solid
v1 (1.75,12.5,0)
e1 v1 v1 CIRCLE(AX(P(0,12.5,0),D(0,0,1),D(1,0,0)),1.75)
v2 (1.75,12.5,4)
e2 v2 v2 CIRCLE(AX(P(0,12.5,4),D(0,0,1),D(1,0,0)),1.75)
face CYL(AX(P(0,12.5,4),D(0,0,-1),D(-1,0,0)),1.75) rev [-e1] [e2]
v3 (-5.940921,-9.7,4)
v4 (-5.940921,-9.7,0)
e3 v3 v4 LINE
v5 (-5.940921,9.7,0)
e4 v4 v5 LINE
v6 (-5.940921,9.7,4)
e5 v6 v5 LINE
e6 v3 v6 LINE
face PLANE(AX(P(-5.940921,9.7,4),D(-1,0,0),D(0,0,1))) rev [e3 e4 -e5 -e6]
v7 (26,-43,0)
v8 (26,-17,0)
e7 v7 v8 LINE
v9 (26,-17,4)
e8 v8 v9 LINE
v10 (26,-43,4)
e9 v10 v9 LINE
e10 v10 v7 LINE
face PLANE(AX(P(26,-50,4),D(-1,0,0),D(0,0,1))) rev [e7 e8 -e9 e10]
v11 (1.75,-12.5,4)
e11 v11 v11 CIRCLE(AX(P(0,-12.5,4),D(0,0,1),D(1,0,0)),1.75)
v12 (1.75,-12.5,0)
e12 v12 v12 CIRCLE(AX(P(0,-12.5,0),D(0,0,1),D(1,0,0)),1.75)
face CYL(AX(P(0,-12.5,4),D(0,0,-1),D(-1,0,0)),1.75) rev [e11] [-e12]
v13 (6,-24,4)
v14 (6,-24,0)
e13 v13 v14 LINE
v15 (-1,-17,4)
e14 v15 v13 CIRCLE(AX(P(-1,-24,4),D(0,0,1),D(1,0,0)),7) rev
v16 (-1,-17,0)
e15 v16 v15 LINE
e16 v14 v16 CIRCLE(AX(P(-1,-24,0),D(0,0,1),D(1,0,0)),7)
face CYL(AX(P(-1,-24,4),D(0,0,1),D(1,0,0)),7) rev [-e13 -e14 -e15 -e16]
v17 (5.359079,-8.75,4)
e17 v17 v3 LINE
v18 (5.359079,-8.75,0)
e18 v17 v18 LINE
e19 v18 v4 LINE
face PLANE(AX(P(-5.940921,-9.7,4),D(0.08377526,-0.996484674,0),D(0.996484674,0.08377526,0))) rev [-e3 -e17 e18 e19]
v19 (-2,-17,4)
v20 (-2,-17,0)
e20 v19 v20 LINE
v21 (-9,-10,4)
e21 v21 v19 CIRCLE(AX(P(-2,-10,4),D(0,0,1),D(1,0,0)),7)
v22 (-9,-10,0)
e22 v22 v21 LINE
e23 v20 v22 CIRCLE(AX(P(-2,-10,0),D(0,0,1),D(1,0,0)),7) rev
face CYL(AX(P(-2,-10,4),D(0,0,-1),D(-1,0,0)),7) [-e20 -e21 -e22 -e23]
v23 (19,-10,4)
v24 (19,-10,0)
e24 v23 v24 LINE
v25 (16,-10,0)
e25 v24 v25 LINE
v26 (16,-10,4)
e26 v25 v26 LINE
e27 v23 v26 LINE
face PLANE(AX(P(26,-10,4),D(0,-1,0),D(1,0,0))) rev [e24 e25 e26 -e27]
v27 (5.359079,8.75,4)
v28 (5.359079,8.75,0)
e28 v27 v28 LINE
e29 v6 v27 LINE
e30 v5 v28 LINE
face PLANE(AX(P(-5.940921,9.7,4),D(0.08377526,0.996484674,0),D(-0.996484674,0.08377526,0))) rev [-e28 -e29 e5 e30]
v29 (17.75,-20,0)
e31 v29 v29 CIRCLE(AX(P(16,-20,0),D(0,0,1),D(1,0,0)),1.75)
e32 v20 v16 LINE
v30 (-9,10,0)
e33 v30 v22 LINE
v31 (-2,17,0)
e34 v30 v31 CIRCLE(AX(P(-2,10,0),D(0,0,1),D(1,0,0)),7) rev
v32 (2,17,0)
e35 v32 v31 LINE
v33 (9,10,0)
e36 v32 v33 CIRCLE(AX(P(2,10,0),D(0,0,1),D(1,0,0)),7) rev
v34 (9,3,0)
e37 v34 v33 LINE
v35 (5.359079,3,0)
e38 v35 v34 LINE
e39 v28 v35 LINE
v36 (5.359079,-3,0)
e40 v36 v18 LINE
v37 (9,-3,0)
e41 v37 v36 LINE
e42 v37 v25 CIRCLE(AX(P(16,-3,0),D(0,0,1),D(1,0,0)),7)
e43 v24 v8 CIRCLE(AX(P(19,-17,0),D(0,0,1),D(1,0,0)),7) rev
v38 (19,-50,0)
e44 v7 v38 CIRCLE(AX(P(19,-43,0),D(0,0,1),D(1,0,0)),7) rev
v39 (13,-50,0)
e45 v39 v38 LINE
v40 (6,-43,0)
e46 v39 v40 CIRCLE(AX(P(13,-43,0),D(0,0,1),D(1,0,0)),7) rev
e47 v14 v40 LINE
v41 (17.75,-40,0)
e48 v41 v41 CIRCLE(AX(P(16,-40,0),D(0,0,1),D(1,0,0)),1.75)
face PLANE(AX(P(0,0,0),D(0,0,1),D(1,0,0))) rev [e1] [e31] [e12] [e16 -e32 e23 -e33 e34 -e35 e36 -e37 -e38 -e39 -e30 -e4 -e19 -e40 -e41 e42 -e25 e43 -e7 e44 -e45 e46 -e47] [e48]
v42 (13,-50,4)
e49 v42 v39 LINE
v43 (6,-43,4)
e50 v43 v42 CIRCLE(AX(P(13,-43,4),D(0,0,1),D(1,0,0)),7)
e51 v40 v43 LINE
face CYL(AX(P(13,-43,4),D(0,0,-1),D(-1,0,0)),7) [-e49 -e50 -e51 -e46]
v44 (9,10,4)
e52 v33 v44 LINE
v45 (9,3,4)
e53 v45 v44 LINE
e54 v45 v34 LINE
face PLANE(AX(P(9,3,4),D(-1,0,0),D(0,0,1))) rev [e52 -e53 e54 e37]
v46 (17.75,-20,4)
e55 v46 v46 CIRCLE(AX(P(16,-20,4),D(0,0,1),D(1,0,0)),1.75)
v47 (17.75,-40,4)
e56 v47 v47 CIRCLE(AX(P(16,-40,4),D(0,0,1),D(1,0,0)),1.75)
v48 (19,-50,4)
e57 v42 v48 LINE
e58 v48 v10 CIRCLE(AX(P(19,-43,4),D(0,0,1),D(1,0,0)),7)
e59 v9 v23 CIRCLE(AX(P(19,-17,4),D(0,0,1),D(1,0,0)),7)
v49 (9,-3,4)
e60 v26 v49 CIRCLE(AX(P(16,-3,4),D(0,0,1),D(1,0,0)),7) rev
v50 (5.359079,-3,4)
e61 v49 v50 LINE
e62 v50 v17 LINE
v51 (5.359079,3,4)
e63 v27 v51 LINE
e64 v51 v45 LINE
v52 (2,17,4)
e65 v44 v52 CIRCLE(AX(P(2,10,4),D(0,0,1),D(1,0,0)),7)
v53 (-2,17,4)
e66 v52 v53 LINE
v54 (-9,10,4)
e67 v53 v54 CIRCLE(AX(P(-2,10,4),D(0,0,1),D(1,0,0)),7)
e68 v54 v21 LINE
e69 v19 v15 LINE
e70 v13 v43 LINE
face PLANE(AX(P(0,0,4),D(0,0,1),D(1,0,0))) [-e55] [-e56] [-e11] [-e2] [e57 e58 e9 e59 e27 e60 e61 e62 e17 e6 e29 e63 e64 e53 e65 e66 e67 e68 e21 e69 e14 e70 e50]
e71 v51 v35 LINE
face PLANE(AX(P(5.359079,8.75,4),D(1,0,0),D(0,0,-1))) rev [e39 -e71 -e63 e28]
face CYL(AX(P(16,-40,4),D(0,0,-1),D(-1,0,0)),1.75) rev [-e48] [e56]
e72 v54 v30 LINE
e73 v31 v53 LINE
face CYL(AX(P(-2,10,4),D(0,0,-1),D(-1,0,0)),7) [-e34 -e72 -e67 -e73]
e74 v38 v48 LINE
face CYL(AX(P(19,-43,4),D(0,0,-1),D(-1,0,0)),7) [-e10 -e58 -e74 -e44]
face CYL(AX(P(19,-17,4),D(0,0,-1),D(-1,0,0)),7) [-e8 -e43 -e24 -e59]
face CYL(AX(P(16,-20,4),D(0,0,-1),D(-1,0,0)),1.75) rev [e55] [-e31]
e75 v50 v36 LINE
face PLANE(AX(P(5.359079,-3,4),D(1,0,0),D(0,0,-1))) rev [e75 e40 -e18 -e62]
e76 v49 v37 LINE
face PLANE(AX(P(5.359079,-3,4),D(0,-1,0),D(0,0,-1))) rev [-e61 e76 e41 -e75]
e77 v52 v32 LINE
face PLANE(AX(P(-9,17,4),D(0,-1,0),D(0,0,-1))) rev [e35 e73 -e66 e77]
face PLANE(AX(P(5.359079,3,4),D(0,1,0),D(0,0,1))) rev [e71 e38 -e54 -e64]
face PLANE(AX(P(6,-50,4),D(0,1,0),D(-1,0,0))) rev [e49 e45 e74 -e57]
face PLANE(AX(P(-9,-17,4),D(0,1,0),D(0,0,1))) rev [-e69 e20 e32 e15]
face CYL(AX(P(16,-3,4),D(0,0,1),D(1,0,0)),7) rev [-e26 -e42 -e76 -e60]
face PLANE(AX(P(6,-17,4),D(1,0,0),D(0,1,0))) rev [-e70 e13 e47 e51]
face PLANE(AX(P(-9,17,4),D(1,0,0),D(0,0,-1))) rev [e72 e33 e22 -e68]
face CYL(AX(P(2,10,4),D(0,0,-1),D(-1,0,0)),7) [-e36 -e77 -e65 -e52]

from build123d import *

# Parameters (mm, degrees)
ESBO_O1_R                = 1.75
RESSALTO_EXTRUS_O1_DEPTH = 4
FILETE2_R                = 7


with BuildPart() as part:
    # Esboço1 → Ressalto-extrusão1 (new body)
    with BuildSketch(Plane.XY):
        Polygon((-9, -17), (6, -17), (6, -50), (26, -50), (26, -10), (9, -10), (9, -3), (5.359078591, -3), (5.359078591, -8.75), (-5.940921409, -9.7), (-5.940921409, 9.7), (5.359078591, 8.75), (5.359078591, 3), (9, 3), (9, 17), (-9, 17), align=None)
        with Locations((16, -40)):
            Circle(ESBO_O1_R, mode=Mode.SUBTRACT)
        with Locations((16, -20)):
            Circle(ESBO_O1_R, mode=Mode.SUBTRACT)
        with Locations((0, -12.5)):
            Circle(ESBO_O1_R, mode=Mode.SUBTRACT)
        with Locations((0, 12.5)):
            Circle(ESBO_O1_R, mode=Mode.SUBTRACT)
    extrude(amount=RESSALTO_EXTRUS_O1_DEPTH)

    # Filete2
    filete2_edges = [part.edges().sort_by_distance(p)[0] for p in [
        (6, -50, 2),
        (6, -17, 2),
        (-9, -17, 2),
        (-9, 17, 2),
        (9, 17, 2),
        (9, -10, 2),
        (26, -10, 2),
        (26, -50, 2),
    ]]
    fillet(filete2_edges, radius=FILETE2_R - 0.0001)  # a hair under: the kernel refuses the full size


solid = part.part
